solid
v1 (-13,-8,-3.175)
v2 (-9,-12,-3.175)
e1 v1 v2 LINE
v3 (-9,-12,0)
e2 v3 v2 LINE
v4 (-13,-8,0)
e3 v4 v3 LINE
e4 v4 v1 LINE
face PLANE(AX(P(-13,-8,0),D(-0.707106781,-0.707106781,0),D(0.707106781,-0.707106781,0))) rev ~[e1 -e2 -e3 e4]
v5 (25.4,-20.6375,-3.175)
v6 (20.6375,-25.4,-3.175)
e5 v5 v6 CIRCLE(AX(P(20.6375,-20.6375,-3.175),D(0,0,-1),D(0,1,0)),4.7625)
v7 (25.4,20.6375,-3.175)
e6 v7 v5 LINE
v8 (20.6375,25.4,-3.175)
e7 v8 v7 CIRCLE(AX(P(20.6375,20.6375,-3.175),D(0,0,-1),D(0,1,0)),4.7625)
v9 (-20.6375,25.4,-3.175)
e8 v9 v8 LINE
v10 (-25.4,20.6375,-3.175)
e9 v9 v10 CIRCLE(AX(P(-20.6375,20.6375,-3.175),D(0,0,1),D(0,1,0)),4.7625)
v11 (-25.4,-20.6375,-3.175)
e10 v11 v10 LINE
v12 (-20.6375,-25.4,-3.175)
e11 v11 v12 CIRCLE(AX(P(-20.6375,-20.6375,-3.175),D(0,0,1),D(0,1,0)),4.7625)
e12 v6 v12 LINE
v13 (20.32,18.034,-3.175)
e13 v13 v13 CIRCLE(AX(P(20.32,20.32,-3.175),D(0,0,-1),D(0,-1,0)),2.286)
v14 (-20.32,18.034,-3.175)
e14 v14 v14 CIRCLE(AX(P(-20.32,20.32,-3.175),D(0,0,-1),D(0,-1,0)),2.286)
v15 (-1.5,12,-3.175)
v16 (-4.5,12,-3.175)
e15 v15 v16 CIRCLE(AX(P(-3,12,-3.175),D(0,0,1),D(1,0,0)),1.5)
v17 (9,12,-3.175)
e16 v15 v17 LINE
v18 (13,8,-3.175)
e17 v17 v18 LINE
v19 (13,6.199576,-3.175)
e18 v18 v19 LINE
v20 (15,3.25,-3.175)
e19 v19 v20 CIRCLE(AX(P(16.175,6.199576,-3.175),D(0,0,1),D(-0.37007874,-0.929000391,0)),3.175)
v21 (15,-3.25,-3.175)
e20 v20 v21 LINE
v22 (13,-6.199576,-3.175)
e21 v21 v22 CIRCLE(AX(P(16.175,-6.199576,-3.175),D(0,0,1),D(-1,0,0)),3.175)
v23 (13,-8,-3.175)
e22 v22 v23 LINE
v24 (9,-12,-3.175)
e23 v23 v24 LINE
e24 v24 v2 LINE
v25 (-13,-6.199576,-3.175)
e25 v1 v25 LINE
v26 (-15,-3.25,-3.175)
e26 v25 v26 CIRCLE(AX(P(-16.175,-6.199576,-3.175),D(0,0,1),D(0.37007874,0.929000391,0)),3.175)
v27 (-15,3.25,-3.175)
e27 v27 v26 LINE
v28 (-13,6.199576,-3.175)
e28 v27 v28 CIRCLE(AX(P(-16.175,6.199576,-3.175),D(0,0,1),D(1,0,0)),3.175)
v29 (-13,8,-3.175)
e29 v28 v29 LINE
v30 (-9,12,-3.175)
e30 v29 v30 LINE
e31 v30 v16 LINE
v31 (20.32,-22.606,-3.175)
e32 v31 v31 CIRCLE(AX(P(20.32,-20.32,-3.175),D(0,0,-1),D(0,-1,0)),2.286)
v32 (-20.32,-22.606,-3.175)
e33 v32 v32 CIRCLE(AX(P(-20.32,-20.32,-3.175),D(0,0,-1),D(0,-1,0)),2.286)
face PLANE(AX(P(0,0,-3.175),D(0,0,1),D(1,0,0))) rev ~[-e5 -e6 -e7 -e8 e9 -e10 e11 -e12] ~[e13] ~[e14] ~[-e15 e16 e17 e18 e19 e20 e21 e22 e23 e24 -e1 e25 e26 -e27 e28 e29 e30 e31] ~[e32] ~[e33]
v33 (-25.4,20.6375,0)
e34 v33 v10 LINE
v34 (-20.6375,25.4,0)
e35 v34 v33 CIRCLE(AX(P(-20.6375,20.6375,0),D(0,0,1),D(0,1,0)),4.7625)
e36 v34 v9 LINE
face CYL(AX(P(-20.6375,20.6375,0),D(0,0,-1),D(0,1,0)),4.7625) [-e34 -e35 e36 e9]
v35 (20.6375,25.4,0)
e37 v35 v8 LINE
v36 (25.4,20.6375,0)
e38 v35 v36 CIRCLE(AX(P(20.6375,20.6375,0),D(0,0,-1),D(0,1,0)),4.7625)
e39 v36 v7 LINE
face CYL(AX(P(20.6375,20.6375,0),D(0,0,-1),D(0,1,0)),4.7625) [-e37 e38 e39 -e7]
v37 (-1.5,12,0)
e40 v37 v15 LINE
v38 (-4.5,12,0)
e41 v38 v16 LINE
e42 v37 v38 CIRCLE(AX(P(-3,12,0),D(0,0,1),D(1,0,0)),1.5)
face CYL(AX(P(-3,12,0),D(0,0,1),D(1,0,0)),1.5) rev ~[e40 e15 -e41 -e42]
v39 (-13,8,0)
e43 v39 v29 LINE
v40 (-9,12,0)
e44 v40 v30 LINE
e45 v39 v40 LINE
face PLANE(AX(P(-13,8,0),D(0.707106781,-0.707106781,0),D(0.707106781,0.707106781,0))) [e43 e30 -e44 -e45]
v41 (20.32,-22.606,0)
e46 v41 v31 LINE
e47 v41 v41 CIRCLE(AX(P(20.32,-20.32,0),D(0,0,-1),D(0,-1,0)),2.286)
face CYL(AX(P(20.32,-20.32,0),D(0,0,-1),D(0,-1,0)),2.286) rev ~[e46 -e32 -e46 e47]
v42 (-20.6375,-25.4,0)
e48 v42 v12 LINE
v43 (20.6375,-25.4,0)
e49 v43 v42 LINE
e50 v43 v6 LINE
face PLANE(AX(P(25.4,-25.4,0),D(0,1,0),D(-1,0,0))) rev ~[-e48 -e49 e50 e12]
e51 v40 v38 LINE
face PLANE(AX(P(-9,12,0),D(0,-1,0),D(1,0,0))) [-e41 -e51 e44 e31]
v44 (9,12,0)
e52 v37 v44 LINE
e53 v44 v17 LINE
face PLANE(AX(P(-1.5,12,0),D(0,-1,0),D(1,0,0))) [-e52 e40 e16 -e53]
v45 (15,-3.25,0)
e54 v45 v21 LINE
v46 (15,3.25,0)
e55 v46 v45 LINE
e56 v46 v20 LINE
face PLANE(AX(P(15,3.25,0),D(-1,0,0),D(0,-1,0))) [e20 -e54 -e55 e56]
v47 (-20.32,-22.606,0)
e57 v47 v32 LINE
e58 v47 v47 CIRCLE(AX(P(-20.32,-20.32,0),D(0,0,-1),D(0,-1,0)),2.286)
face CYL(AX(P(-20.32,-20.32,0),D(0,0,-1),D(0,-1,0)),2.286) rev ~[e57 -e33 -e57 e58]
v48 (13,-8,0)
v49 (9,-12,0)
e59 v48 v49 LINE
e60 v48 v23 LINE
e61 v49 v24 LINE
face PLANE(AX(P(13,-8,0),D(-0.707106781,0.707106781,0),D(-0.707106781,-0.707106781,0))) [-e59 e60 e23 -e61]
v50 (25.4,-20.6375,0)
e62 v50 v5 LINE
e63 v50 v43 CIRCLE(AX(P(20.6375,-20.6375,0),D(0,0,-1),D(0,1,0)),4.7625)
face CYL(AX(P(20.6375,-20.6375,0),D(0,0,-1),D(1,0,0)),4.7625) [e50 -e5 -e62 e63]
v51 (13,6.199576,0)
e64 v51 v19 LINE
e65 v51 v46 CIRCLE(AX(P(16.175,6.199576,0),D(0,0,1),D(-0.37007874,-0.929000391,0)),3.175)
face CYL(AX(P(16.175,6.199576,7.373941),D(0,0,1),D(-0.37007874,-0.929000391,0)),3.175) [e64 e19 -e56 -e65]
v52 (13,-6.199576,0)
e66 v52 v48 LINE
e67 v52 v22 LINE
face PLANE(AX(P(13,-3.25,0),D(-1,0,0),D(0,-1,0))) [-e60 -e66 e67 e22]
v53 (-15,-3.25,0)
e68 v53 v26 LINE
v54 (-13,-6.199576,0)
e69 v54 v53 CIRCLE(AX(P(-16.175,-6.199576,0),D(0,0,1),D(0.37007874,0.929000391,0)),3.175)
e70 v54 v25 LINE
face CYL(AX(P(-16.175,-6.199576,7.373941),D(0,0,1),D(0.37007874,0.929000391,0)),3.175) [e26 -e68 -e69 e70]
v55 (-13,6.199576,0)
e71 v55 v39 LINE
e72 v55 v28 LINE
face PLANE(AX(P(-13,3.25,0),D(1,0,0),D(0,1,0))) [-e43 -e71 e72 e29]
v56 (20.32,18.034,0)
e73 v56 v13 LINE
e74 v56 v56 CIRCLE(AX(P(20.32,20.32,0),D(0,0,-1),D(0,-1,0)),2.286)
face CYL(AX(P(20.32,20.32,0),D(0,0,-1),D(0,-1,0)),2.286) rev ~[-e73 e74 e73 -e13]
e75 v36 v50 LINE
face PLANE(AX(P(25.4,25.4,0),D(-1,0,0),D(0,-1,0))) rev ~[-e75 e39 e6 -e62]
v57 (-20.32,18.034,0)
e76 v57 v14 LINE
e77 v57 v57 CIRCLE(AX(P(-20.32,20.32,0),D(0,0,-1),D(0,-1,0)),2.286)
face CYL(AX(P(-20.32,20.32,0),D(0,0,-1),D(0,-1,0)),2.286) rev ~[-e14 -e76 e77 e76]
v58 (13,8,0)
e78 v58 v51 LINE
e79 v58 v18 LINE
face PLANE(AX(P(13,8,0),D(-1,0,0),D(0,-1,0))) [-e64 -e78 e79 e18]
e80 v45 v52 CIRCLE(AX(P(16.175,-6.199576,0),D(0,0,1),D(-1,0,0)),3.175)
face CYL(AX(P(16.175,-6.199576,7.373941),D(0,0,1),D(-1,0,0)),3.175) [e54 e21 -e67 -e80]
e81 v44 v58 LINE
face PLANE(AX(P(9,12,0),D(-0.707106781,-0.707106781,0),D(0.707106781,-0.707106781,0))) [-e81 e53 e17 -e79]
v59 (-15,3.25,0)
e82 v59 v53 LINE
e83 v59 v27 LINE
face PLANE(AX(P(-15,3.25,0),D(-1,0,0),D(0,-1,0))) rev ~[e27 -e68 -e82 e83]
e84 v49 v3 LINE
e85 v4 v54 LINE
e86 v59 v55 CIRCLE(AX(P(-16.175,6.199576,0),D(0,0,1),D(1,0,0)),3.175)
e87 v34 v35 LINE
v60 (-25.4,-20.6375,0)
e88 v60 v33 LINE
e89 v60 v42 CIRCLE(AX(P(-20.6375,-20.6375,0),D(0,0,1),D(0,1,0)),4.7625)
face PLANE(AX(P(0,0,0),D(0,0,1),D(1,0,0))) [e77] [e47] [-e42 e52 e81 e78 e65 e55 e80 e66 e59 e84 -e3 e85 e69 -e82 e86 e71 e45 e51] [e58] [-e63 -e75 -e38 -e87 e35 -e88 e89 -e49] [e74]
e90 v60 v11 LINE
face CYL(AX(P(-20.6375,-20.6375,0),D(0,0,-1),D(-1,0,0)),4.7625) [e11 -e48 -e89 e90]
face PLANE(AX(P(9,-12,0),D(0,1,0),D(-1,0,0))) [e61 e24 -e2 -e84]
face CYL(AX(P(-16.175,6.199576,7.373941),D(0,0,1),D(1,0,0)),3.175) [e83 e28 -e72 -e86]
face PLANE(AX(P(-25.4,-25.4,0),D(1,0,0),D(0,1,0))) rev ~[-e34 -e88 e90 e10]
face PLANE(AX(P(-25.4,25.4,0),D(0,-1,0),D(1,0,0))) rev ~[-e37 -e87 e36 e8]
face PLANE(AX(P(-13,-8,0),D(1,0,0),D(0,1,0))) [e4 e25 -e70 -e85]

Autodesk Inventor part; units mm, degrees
ref_plane "YZ Plane" through (0, 0, 0) normal (1, 0, 0) x (0, 1, 0)
ref_plane "XZ Plane" through (0, 0, 0) normal (0, 1, 0) x (-1, 0, 0)
ref_plane "XY Plane" through (0, 0, 0) normal (0, 0, 1) x (1, 0, 0)
sketch "Sketch1" plane through (0, 0, 0) normal (0, 0, 1) x (1, 0, 0)
  line L0 (-13, 12) -> (13, 12)
  line L1 (13, 12) -> (13, -12)
  line L2 (13, -12) -> (-13, -12)
  line L3 (-13, -12) -> (-13, 12)
  line L4 (-13, 3.25) -> (-15, 3.25)
  line L5 (-15, 3.25) -> (-15, -3.25)
  line L6 (-15, -3.25) -> (-13, -3.25)
  line L7 (-13, -3.25) -> (-13, 3.25)
  line L8 (13, 3.25) -> (15, 3.25)
  line L9 (15, 3.25) -> (15, -3.25)
  line L10 (15, -3.25) -> (13, -3.25)
  line L11 (13, -3.25) -> (13, 3.25)
  line L12 (-25.4, 25.4) -> (25.4, 25.4)
  line L13 (25.4, 25.4) -> (25.4, -25.4)
  line L14 (25.4, -25.4) -> (-25.4, -25.4)
  line L15 (-25.4, -25.4) -> (-25.4, 25.4)
  circle A0 centre (0, 0) radius 7.1437
  circle A1 centre (-3, 12) radius 1.5
  line L16 (-13, 8) -> (-9, 12)
  line L17 (9, 12) -> (13, 8)
  line L18 (13, -8) -> (9, -12)
  line L19 (-13, -8) -> (-9, -12)
  point P0 (-14, 3.25)
  point P1 (14, 3.25)
  point P2 (-14, -3.25)
  point P3 (14, -3.25)
  point P4 (-20.32, 20.32)
  point P5 (20.32, 20.32)
  point P6 (20.32, -20.32)
  point P7 (-20.32, -20.32)
  dimension "d0" = 24
  dimension "d1" = 12
  dimension "d2" = 26
  dimension "d3" = 13
  dimension "d4" = 2
  dimension "d5" = 6.5
  dimension "d6" = 3.25
  dimension "d7" = 2
  dimension "d8" = 14.2875
  dimension "d9" = 50.8
  dimension "d10" = 25.4
  dimension "d11" = 50.8
  dimension "d12" = 25.4
  dimension "d13" = 3
  dimension "d14" = 10
  dimension "d15" = 4
  dimension "d16" = 4
  dimension "d17" = 4
  dimension "d18" = 4
  dimension "d19" = 4
  dimension "d20" = 5.08
  dimension "d21" = 5.08
  dimension "d22" = 5.08
  dimension "d23" = 5.08
  dimension "d34" = 40.64
  dimension "d35" = 40.64
extrude "Extrusion1" add sketch "Sketch1" against normal blind 3.175 contours L0 L16 L3 | L0 L1 L17 | L19 L2 L3 | L18 L1 L2 | L12 L13 L14 L15
fillet "Fillet1" radius 3.175 4 edges at (-13, -3.25, -1.5875) (-13, 3.25, -1.5875) (13, 3.25, -1.5875) (13, -3.25, -1.5875)
hole "Hole1" at (-20.32, 20.32, 0) at (20.32, 20.32, 0) at (20.32, -20.32, 0) at (-20.32, -20.32, 0) direction (0, 0, -1) diameter 4.572 end through all
thread "Thread1" size "10-32 UNF" class "2B" standard "ANSI Unified Screw Threads" full length
thread "Thread2" size "10-32 UNF" class "2B" standard "ANSI Unified Screw Threads" full length
thread "Thread3" size "10-32 UNF" class "2B" standard "ANSI Unified Screw Threads" full length
thread "Thread4" size "10-32 UNF" class "2B" standard "ANSI Unified Screw Threads" full length
fillet "Fillet2" radius 4.7625 4 edges at (25.4, 25.4, -1.5875) (25.4, -25.4, -1.5875) (-25.4, 25.4, -1.5875) (-25.4, -25.4, -1.5875)
equation "\"d1\" = 0.5 * d0"
equation "\"d3\" = 0.5 * d2"
equation "\"d6\" = 0.5 * d5"
equation "\"d7\" = d4"
equation "\"d10\" = 0.5 * d9"
equation "\"d12\" = 0.5 * d11"
equation "\"d16\" = d15"
equation "\"d17\" = d15"
equation "\"d18\" = d15"
equation "\"d19\" = d15"
equation "\"d22\" = d21"
equation "\"d23\" = d21"
properties part number "BD gearbox mount block"
